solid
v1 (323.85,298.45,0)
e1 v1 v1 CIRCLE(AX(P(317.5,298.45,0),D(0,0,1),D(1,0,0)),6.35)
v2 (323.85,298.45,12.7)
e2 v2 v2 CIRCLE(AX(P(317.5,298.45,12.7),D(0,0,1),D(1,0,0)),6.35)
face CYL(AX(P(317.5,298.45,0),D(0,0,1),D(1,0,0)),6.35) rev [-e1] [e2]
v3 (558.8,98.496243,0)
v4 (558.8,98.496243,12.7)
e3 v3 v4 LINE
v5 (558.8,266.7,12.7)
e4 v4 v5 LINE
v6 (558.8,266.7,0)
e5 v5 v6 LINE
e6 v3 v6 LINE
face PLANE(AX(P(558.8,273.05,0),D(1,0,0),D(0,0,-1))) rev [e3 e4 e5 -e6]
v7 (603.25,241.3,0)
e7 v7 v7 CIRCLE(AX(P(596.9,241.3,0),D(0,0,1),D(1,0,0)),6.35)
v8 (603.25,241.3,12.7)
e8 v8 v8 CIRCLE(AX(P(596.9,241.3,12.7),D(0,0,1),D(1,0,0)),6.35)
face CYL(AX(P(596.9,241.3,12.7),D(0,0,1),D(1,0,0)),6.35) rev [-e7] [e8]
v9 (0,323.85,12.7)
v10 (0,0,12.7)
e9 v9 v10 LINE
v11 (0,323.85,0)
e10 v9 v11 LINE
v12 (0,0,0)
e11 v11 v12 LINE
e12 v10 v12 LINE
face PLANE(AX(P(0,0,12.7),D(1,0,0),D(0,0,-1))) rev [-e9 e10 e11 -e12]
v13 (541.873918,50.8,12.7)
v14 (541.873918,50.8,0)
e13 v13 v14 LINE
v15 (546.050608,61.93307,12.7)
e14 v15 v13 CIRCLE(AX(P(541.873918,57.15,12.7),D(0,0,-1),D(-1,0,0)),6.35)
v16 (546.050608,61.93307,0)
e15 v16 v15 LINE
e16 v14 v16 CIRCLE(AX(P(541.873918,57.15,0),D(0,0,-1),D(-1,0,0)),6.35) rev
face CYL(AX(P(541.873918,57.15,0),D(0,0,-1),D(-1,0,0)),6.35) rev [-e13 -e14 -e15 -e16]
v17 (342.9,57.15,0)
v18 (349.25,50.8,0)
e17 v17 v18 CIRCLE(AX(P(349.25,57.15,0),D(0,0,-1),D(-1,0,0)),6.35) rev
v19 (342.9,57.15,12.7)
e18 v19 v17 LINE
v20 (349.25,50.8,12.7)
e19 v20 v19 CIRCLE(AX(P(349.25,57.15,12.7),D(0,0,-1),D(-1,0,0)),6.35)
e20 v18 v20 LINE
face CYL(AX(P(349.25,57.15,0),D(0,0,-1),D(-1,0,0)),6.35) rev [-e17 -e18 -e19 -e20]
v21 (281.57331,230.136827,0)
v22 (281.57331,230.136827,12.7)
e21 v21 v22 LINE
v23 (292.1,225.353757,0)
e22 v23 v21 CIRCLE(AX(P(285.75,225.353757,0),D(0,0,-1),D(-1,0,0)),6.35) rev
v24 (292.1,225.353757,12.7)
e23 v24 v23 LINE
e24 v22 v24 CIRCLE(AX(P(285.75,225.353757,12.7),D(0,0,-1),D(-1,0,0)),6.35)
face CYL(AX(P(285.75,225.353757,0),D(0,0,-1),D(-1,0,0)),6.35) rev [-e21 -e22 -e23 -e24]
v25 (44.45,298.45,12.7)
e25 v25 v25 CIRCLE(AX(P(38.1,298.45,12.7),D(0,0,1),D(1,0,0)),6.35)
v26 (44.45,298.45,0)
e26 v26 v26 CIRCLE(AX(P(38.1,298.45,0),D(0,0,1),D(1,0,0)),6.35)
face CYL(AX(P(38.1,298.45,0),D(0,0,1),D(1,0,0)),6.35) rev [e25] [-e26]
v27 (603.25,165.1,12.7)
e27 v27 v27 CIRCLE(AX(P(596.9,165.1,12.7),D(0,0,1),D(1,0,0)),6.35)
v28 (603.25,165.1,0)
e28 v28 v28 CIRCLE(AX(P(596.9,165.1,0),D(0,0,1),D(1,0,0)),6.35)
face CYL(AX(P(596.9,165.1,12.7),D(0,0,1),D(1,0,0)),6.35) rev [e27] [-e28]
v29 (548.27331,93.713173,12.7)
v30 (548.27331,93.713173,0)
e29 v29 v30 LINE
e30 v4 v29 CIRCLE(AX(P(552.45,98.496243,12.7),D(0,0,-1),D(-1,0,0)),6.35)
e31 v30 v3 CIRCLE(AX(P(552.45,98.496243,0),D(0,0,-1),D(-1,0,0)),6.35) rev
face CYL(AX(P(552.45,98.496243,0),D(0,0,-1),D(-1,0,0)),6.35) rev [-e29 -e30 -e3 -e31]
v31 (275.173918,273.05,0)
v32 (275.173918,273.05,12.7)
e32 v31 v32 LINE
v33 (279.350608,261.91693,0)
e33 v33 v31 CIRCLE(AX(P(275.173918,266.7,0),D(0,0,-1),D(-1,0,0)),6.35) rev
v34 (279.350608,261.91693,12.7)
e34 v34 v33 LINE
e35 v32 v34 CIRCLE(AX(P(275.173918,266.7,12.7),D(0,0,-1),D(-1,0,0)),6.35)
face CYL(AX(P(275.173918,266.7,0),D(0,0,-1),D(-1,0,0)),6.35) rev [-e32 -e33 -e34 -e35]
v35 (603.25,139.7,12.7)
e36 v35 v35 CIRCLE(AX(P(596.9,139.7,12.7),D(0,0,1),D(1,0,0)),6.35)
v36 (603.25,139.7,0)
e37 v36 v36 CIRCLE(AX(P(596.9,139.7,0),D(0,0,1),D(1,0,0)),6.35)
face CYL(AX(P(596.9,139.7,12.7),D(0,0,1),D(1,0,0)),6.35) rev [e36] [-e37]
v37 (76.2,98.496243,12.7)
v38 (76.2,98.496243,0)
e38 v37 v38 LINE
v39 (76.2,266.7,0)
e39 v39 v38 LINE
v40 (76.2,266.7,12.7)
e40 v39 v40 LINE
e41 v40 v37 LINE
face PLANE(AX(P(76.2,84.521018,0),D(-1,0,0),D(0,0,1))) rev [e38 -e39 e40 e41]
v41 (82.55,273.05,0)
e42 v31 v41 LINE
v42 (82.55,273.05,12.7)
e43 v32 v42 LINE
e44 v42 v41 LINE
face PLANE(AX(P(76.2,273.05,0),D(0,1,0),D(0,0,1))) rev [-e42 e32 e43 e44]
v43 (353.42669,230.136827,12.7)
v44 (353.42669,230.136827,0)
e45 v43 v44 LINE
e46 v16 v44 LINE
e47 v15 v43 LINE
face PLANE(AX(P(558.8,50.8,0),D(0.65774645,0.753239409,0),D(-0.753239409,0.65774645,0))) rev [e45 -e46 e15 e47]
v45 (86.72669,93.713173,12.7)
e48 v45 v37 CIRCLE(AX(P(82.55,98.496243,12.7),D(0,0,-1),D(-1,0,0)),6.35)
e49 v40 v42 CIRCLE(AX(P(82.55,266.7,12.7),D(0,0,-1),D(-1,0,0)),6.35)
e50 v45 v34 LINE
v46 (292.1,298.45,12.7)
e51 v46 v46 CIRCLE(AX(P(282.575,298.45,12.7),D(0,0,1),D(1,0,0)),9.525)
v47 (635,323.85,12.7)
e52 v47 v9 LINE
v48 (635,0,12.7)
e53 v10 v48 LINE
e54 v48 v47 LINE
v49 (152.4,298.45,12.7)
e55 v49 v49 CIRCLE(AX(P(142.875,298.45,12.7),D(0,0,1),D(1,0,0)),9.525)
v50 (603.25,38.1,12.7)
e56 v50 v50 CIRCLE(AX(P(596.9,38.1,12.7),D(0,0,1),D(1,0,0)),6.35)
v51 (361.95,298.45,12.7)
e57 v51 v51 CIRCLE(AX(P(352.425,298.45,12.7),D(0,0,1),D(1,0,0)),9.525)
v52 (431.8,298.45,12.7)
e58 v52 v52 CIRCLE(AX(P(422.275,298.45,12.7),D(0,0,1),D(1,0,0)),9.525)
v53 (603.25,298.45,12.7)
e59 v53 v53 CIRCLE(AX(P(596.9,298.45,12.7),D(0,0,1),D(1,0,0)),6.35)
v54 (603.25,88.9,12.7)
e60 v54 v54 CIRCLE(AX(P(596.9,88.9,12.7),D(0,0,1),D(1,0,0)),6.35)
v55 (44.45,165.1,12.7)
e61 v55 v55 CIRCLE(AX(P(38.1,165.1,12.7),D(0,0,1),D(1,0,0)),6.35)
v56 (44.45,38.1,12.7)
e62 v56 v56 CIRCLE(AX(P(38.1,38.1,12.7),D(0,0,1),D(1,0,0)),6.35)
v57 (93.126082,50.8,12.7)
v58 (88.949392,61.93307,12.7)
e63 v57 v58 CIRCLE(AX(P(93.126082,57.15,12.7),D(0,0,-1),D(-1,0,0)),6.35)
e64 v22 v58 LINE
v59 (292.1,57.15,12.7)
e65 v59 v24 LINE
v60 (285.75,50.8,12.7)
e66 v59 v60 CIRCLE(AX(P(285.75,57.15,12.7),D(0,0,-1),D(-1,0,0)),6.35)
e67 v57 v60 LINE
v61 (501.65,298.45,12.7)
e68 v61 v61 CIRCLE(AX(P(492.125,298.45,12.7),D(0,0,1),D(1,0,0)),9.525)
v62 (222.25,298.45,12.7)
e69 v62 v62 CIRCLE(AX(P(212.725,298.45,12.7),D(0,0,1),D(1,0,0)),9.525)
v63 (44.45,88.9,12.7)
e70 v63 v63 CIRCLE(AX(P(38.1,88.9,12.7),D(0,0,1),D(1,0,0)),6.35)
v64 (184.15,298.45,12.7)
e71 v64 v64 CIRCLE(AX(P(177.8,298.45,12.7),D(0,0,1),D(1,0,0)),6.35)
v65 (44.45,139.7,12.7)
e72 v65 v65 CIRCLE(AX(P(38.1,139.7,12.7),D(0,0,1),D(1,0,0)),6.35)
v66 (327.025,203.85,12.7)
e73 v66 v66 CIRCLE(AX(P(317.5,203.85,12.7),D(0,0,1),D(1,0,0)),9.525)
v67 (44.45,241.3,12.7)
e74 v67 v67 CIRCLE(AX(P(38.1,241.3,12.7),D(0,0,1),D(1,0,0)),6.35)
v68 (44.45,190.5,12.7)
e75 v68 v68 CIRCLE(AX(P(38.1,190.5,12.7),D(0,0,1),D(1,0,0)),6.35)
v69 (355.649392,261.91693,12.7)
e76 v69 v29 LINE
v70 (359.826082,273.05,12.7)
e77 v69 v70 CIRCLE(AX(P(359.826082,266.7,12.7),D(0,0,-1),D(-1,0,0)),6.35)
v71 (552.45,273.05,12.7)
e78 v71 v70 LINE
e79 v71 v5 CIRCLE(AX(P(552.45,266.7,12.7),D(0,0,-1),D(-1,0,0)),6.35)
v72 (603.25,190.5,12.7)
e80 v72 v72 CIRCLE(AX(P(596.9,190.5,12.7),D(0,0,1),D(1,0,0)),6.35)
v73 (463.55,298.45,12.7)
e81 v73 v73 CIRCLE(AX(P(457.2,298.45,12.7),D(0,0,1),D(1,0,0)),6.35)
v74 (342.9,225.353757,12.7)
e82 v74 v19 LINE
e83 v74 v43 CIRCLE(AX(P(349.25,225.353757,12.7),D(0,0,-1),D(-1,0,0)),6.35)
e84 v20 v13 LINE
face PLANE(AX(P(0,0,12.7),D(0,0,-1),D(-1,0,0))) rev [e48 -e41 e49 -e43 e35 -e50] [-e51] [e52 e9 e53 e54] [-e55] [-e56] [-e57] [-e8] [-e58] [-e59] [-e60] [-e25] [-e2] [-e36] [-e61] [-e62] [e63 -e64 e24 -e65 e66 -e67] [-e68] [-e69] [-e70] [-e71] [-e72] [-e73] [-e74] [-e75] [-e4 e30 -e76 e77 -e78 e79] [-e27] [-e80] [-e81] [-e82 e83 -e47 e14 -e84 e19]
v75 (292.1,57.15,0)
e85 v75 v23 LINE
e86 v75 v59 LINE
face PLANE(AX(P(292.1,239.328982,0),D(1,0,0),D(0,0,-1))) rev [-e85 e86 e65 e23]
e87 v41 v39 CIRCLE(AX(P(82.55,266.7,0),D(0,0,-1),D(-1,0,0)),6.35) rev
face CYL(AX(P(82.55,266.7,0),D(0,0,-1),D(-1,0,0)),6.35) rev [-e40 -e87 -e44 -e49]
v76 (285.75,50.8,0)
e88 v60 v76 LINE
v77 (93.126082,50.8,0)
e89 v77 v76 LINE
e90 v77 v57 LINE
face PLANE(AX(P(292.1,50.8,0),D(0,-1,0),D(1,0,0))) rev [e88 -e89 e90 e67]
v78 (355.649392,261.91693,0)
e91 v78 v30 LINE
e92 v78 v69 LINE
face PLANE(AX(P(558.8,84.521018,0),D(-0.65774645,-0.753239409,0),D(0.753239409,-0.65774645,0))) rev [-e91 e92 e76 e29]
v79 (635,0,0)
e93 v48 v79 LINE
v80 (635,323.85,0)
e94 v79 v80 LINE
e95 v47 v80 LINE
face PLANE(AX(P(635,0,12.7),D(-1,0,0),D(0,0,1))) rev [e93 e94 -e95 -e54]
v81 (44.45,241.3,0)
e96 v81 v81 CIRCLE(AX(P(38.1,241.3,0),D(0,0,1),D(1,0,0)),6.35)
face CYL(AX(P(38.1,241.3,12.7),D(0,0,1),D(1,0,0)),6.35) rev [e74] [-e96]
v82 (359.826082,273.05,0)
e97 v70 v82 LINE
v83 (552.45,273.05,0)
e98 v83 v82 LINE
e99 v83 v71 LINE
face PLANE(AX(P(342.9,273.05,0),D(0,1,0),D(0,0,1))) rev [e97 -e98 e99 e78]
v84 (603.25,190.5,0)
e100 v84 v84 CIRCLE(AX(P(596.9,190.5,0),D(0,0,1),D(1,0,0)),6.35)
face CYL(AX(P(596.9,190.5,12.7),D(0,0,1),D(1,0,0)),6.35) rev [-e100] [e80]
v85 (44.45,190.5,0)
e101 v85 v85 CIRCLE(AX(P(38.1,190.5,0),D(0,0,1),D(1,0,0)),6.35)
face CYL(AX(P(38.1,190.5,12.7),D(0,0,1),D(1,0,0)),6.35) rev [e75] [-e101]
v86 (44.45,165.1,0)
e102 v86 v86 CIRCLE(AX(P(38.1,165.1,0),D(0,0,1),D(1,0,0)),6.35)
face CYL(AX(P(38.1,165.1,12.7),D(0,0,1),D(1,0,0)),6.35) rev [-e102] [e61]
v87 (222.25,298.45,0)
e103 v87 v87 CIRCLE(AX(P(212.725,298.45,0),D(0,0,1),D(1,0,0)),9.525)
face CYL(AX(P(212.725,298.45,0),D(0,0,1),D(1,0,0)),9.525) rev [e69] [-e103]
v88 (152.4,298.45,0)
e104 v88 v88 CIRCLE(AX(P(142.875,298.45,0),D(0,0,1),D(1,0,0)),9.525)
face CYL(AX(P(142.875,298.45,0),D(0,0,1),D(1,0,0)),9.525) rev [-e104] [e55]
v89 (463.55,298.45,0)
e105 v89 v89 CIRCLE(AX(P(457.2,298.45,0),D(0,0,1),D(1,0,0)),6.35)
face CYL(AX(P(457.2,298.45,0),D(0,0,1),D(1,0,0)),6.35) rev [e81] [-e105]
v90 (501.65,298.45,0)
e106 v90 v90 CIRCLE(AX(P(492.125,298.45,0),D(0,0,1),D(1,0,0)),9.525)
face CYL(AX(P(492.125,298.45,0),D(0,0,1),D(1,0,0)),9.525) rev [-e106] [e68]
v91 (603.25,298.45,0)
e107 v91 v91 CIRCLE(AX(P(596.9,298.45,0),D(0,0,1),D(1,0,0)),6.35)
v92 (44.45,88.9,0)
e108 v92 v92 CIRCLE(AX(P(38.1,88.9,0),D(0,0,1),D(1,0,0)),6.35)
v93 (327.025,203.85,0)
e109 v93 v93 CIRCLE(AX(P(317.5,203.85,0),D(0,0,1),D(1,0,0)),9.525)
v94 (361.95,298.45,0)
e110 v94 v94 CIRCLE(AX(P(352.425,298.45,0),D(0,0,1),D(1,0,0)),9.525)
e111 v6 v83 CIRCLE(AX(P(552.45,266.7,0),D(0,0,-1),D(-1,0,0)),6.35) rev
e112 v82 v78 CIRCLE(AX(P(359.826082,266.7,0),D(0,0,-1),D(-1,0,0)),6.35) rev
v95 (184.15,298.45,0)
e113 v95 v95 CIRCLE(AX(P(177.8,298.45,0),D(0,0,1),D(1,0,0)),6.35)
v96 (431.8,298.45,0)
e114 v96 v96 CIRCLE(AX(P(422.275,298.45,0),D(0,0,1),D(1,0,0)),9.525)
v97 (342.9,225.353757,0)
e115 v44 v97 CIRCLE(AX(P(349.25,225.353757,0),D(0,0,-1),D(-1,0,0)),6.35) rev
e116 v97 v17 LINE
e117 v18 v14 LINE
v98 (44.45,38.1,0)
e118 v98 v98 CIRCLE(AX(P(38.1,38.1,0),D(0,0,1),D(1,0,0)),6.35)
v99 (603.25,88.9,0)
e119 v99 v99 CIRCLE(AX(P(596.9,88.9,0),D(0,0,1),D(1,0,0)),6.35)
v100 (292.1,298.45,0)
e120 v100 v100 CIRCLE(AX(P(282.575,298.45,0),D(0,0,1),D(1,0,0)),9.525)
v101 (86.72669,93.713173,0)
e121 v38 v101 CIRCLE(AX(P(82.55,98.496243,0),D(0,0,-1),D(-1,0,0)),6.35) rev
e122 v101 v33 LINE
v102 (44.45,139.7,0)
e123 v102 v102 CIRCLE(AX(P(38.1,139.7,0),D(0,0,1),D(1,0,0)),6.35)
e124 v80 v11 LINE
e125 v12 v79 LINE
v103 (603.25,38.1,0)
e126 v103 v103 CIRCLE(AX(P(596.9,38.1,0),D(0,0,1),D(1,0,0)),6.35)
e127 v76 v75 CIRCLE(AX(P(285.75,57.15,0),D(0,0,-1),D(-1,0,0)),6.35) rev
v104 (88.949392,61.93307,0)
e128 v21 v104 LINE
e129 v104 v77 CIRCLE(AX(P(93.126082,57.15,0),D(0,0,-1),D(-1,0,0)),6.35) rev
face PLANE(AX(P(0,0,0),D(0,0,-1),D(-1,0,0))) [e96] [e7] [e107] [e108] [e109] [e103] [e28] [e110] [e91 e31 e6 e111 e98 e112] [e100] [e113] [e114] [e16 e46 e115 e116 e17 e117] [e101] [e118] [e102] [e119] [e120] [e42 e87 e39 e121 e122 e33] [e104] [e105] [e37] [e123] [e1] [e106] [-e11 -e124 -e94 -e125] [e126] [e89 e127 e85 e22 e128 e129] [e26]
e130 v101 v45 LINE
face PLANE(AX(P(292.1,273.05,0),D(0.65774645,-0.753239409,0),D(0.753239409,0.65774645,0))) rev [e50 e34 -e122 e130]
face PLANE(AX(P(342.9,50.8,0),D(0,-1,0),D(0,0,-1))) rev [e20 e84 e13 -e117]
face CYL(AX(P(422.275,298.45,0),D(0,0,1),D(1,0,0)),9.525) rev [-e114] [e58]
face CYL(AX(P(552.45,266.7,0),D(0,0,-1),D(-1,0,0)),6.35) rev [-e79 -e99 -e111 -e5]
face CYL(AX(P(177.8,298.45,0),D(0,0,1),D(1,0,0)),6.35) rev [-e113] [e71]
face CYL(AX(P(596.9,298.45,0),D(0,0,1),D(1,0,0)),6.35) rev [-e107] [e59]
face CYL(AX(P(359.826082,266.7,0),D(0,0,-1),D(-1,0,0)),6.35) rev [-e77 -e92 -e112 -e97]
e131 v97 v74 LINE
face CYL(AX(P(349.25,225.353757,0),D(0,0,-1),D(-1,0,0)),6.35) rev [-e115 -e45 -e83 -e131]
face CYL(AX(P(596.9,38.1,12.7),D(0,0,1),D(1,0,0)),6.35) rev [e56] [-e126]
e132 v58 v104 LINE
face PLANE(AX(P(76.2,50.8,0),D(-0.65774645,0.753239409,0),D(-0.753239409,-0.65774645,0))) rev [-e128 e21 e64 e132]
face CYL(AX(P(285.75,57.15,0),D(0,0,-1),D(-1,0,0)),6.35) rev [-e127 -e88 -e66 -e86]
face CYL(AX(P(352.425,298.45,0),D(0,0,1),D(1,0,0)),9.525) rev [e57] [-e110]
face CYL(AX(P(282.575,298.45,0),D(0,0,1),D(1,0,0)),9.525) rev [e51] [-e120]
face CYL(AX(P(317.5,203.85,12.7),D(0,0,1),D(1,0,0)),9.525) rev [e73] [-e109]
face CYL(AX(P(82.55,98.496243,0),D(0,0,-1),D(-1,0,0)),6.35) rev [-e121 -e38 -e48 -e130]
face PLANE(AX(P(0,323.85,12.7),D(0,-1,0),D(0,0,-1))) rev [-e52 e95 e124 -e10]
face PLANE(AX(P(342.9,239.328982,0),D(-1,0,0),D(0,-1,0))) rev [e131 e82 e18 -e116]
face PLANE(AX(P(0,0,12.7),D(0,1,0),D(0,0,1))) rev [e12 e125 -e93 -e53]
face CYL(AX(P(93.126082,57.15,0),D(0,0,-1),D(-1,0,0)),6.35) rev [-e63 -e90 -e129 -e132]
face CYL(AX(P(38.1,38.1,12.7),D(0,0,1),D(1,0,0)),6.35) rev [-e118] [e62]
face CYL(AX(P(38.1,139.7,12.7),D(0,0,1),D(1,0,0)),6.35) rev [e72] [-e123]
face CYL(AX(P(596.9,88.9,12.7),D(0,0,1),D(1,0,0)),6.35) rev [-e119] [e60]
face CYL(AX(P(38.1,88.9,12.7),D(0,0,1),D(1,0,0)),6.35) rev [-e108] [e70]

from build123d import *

# Parameters (mm, degrees)
SKETCH1_W                   = 635
SKETCH1_H                   = 323.85
BOSS_EXTRUDE1_DEPTH         = 12.7
F_3_4_0_75_DIAMETER_HOLE1_D = 19.05
F_1_2_0_5_DIAMETER_HOLE1_D  = 12.7
LPATTERN1_COUNT             = 2
LPATTERN1_PITCH             = 558.8
LPATTERN1_COUNT_DIR2        = 5
LPATTERN1_PITCH_DIR2        = 50.8
HOLE1_OUTLINE_R             = 9.525
HOLE1_DEPTH                 = 12.7
LPATTERN2_COUNT             = 6
LPATTERN2_PITCH             = 69.85
HOLE2_OUTLINE_R             = 6.35
HOLE2_DEPTH                 = 12.7
LPATTERN3_COUNT             = 5
LPATTERN3_PITCH             = 139.7
CUT_EXTRUDE1_DEPTH          = 713.927143893
FILLET1_R                   = 6.35
F_1_2_0_5_DIAMETER_HOLE2_D  = 12.7


# Read off the part's stored shape, not the designer's step: Hole1, Hole2
with BuildPart() as part:
    # Sketch1 → Boss-Extrude1 (new body)
    with BuildSketch(Plane.XY):
        with Locations((317.5, 161.925)):
            Rectangle(SKETCH1_W, SKETCH1_H)
    extrude(amount=BOSS_EXTRUDE1_DEPTH)

    # 3/4 (0.75) Diameter Hole1 (through all)
    with Locations(Plane.XY.offset(12.7)):
        with Locations((317.5, 203.85)):
            Hole(F_3_4_0_75_DIAMETER_HOLE1_D / 2)

    # 1/2 (0.5) Diameter Hole1 (through all)
    with Locations(Plane.XY.offset(12.7)):
        with Locations((38.1, 38.1)):
            f_1_2_0_5_diameter_hole1 = Hole(F_1_2_0_5_DIAMETER_HOLE1_D / 2)

    # LPattern1: 1_2 _0.5_ Diameter Hole1 2 × 5
    with Locations(*[(i * LPATTERN1_PITCH, j * LPATTERN1_PITCH_DIR2, 0) for i in range(LPATTERN1_COUNT) for j in range(LPATTERN1_COUNT_DIR2) if (i, j) != (0, 0)]):
        add(f_1_2_0_5_diameter_hole1, mode=Mode.SUBTRACT)

    # Hole1 outline → Hole1 (cut)
    with BuildSketch(Plane.XY):
        with Locations((142.875, 298.45)):
            Circle(HOLE1_OUTLINE_R)
    hole1 = extrude(amount=HOLE1_DEPTH, mode=Mode.SUBTRACT)

    # LPattern2: Hole1 ×6
    with Locations(*[(i * LPATTERN2_PITCH, 0, 0) for i in range(1, LPATTERN2_COUNT)]):
        add(hole1, mode=Mode.SUBTRACT)

    # Hole2 outline → Hole2 (cut)
    with BuildSketch(Plane.XY):
        with Locations((38.1, 298.45)):
            Circle(HOLE2_OUTLINE_R)
    hole2 = extrude(amount=HOLE2_DEPTH, mode=Mode.SUBTRACT)

    # LPattern3: Hole2 ×5
    with Locations(*[(i * LPATTERN3_PITCH, 0, 0) for i in range(1, LPATTERN3_COUNT)]):
        add(hole2, mode=Mode.SUBTRACT)

    # Sketch9 → Cut-Extrude1 (cut, through all)
    with BuildSketch(Plane.XY.offset(12.7)):
        Polygon((76.2, 273.05), (292.1, 273.05), (76.2, 84.521018444), align=None)
        Polygon((76.2, 50.8), (292.1, 239.328981556), (292.1, 50.8), align=None)
        Polygon((342.9, 273.05), (558.8, 273.05), (558.8, 84.521018444), align=None)
        Polygon((342.9, 239.328981556), (342.9, 50.8), (558.8, 50.8), align=None)
    extrude(amount=-CUT_EXTRUDE1_DEPTH, mode=Mode.SUBTRACT)

    # Fillet1
    fillet1_edges = [part.edges().sort_by_distance(p)[0] for p in [
        (292.1, 50.8, 6.35),
        (76.2, 50.8, 6.35),
        (292.1, 239.328981556, 6.35),
        (558.8, 84.521018444, 6.35),
        (342.9, 273.05, 6.35),
        (558.8, 273.05, 6.35),
        (342.9, 239.328981556, 6.35),
        (558.8, 50.8, 6.35),
        (342.9, 50.8, 6.35),
        (76.2, 84.521018444, 6.35),
        (76.2, 273.05, 6.35),
        (292.1, 273.05, 6.35),
    ]]
    fillet(fillet1_edges, radius=FILLET1_R)

    # 1/2 (0.5) Diameter Hole2 (through all)
    with Locations(Plane.XY.offset(12.7)):
        with Locations((38.1, 165.1), (596.9, 165.1)):
            Hole(F_1_2_0_5_DIAMETER_HOLE2_D / 2)


solid = part.part
